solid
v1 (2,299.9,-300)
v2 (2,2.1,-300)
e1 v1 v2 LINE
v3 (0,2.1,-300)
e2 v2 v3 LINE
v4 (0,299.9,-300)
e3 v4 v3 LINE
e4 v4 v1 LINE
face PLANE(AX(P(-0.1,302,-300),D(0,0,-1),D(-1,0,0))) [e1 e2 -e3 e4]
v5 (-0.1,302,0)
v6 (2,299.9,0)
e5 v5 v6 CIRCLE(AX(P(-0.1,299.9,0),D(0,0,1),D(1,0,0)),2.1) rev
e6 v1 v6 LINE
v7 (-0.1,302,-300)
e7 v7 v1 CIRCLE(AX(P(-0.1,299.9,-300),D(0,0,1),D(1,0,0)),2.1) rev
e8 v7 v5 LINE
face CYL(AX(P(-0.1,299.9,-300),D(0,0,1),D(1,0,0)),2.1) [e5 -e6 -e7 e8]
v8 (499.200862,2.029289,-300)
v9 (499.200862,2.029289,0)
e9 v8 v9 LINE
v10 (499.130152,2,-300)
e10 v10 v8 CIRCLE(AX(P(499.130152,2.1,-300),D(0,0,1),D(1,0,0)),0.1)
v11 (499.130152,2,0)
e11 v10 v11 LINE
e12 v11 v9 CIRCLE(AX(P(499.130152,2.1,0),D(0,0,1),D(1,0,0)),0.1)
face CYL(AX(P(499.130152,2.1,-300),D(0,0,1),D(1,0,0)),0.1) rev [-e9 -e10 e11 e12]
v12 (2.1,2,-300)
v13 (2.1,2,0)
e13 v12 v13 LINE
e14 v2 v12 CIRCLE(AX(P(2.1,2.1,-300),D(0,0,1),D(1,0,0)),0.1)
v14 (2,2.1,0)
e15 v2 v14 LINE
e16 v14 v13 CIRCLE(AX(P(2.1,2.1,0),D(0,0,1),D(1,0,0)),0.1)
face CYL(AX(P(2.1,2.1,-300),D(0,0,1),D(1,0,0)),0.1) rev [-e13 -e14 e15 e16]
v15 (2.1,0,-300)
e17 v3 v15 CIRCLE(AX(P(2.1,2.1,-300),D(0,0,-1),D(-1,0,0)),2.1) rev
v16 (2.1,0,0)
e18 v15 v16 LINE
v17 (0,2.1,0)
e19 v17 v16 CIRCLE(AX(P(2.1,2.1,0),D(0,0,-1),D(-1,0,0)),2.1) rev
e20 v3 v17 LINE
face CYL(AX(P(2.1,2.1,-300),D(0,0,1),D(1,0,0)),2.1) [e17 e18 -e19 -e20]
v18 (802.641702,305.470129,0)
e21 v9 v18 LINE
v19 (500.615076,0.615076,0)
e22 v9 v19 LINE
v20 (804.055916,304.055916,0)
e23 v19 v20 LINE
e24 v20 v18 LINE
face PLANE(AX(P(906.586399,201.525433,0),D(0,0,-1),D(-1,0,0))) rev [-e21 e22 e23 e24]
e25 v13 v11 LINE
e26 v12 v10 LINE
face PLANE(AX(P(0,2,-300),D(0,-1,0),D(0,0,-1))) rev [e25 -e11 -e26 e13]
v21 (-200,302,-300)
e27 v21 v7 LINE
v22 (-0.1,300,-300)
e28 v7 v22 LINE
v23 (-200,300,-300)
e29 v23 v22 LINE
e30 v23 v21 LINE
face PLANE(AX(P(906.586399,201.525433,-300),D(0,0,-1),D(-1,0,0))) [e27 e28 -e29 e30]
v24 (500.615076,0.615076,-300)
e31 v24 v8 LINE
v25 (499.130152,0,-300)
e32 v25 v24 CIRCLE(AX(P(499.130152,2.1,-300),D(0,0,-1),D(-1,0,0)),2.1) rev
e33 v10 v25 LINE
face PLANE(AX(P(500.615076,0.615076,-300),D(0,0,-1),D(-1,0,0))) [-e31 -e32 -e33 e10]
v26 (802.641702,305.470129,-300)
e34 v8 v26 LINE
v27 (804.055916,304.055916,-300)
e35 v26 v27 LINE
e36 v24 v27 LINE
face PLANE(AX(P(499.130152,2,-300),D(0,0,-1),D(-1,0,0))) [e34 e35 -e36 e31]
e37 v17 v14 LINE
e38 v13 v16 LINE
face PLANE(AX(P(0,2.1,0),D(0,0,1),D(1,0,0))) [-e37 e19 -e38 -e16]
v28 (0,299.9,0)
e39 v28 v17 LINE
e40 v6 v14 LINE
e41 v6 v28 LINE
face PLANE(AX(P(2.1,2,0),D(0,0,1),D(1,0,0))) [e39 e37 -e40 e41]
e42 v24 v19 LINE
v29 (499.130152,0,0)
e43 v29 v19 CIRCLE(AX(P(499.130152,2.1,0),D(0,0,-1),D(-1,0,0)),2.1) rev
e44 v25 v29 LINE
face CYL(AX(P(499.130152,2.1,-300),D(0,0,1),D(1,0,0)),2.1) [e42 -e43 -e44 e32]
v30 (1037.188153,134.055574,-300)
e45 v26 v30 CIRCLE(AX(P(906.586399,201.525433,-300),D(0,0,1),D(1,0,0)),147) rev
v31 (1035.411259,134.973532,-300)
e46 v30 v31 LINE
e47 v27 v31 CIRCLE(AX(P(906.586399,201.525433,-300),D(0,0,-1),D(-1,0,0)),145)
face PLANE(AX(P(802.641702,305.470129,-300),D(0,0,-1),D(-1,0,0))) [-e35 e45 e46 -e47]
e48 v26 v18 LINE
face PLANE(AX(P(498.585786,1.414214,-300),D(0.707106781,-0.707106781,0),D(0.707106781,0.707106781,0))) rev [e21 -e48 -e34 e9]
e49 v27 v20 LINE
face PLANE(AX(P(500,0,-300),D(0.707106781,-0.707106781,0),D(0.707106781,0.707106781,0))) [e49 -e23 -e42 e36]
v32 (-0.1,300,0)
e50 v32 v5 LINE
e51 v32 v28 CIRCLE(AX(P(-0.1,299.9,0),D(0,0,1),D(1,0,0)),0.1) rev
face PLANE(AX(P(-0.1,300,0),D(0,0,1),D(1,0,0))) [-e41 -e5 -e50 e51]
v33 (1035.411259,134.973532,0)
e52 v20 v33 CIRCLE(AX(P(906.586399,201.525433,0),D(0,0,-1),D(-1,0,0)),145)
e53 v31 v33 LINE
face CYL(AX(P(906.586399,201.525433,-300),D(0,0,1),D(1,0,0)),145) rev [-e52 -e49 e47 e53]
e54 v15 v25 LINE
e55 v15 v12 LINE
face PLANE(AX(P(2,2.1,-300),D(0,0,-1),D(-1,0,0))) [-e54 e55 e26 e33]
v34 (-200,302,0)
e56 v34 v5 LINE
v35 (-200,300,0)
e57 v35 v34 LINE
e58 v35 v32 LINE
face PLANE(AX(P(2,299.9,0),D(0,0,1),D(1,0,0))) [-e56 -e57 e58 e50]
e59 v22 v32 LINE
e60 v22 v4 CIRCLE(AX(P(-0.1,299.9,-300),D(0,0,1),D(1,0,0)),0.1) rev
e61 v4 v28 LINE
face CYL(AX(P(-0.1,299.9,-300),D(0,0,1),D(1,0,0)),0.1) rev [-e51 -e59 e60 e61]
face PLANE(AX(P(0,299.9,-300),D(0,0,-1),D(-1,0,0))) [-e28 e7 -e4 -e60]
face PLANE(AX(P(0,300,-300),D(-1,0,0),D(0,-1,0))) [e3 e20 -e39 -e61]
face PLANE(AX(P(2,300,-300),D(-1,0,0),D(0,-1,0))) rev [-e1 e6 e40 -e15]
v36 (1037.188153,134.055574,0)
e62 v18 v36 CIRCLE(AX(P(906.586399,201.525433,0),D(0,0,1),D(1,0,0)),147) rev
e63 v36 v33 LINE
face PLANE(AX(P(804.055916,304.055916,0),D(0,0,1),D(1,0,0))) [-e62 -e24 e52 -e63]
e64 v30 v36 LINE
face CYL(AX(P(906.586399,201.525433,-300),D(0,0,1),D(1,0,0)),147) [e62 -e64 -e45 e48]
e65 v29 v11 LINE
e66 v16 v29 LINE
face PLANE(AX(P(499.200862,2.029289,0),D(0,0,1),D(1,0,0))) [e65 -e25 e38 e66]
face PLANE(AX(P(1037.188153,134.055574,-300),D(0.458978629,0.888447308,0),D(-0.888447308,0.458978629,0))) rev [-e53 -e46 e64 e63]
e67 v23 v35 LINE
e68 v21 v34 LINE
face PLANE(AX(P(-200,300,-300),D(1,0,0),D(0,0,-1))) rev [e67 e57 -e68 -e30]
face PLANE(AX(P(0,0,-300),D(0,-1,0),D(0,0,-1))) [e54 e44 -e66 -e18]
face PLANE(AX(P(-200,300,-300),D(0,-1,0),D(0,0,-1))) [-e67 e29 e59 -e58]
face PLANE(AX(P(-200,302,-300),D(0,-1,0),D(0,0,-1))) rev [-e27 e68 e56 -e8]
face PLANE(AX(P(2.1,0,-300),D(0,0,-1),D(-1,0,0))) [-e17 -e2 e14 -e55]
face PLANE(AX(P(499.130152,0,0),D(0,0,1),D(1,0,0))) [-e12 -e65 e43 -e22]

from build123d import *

# Parameters (mm, degrees)
SM_BASE_FLANGE_1_DEPTH = 300


# Sheet-metal steps are written as plain solids
with BuildPart() as part:
    # Sketch 1 → 基体-法兰1 (new body)
    with BuildSketch(Plane.XY):
        with BuildLine():
            Line((-200, 300), (-0.1, 300))
            ThreePointArc((-0.1, 300), (-0.029289322, 299.970710678), (0, 299.9))
            Line((0, 299.9), (0, 2.1))
            ThreePointArc((0, 2.1), (0.61507576, 0.61507576), (2.1, 0))
            Line((2.1, 0), (499.130151519, 0))
            ThreePointArc((499.130151519, 0), (499.933786727, 0.159852982), (500.61507576, 0.61507576))
            Line((500.61507576, 0.61507576), (804.05591591, 304.05591591))
            ThreePointArc((804.05591591, 304.05591591), (992.143758514, 318.593525064), (1035.4112588, 134.973531505))
            Line((1035.4112588, 134.973531505), (1037.188153416, 134.055574248))
            ThreePointArc((1037.188153416, 134.055574248), (993.323860022, 320.208257373), (802.641702348, 305.470129473))
            Line((802.641702348, 305.470129473), (499.200862197, 2.029289322))
            ThreePointArc((499.200862197, 2.029289322), (499.168419862, 2.007612047), (499.130151519, 2))
            Line((499.130151519, 2), (2.1, 2))
            ThreePointArc((2.1, 2), (2.029289322, 2.029289322), (2, 2.1))
            Line((2, 2.1), (2, 299.9))
            ThreePointArc((2, 299.9), (1.38492424, 301.384924241), (-0.100000001, 302))
            Line((-0.1, 302), (-200, 302))
            Line((-200, 302), (-200, 300))
        make_face()
    extrude(amount=-SM_BASE_FLANGE_1_DEPTH)


solid = part.part
